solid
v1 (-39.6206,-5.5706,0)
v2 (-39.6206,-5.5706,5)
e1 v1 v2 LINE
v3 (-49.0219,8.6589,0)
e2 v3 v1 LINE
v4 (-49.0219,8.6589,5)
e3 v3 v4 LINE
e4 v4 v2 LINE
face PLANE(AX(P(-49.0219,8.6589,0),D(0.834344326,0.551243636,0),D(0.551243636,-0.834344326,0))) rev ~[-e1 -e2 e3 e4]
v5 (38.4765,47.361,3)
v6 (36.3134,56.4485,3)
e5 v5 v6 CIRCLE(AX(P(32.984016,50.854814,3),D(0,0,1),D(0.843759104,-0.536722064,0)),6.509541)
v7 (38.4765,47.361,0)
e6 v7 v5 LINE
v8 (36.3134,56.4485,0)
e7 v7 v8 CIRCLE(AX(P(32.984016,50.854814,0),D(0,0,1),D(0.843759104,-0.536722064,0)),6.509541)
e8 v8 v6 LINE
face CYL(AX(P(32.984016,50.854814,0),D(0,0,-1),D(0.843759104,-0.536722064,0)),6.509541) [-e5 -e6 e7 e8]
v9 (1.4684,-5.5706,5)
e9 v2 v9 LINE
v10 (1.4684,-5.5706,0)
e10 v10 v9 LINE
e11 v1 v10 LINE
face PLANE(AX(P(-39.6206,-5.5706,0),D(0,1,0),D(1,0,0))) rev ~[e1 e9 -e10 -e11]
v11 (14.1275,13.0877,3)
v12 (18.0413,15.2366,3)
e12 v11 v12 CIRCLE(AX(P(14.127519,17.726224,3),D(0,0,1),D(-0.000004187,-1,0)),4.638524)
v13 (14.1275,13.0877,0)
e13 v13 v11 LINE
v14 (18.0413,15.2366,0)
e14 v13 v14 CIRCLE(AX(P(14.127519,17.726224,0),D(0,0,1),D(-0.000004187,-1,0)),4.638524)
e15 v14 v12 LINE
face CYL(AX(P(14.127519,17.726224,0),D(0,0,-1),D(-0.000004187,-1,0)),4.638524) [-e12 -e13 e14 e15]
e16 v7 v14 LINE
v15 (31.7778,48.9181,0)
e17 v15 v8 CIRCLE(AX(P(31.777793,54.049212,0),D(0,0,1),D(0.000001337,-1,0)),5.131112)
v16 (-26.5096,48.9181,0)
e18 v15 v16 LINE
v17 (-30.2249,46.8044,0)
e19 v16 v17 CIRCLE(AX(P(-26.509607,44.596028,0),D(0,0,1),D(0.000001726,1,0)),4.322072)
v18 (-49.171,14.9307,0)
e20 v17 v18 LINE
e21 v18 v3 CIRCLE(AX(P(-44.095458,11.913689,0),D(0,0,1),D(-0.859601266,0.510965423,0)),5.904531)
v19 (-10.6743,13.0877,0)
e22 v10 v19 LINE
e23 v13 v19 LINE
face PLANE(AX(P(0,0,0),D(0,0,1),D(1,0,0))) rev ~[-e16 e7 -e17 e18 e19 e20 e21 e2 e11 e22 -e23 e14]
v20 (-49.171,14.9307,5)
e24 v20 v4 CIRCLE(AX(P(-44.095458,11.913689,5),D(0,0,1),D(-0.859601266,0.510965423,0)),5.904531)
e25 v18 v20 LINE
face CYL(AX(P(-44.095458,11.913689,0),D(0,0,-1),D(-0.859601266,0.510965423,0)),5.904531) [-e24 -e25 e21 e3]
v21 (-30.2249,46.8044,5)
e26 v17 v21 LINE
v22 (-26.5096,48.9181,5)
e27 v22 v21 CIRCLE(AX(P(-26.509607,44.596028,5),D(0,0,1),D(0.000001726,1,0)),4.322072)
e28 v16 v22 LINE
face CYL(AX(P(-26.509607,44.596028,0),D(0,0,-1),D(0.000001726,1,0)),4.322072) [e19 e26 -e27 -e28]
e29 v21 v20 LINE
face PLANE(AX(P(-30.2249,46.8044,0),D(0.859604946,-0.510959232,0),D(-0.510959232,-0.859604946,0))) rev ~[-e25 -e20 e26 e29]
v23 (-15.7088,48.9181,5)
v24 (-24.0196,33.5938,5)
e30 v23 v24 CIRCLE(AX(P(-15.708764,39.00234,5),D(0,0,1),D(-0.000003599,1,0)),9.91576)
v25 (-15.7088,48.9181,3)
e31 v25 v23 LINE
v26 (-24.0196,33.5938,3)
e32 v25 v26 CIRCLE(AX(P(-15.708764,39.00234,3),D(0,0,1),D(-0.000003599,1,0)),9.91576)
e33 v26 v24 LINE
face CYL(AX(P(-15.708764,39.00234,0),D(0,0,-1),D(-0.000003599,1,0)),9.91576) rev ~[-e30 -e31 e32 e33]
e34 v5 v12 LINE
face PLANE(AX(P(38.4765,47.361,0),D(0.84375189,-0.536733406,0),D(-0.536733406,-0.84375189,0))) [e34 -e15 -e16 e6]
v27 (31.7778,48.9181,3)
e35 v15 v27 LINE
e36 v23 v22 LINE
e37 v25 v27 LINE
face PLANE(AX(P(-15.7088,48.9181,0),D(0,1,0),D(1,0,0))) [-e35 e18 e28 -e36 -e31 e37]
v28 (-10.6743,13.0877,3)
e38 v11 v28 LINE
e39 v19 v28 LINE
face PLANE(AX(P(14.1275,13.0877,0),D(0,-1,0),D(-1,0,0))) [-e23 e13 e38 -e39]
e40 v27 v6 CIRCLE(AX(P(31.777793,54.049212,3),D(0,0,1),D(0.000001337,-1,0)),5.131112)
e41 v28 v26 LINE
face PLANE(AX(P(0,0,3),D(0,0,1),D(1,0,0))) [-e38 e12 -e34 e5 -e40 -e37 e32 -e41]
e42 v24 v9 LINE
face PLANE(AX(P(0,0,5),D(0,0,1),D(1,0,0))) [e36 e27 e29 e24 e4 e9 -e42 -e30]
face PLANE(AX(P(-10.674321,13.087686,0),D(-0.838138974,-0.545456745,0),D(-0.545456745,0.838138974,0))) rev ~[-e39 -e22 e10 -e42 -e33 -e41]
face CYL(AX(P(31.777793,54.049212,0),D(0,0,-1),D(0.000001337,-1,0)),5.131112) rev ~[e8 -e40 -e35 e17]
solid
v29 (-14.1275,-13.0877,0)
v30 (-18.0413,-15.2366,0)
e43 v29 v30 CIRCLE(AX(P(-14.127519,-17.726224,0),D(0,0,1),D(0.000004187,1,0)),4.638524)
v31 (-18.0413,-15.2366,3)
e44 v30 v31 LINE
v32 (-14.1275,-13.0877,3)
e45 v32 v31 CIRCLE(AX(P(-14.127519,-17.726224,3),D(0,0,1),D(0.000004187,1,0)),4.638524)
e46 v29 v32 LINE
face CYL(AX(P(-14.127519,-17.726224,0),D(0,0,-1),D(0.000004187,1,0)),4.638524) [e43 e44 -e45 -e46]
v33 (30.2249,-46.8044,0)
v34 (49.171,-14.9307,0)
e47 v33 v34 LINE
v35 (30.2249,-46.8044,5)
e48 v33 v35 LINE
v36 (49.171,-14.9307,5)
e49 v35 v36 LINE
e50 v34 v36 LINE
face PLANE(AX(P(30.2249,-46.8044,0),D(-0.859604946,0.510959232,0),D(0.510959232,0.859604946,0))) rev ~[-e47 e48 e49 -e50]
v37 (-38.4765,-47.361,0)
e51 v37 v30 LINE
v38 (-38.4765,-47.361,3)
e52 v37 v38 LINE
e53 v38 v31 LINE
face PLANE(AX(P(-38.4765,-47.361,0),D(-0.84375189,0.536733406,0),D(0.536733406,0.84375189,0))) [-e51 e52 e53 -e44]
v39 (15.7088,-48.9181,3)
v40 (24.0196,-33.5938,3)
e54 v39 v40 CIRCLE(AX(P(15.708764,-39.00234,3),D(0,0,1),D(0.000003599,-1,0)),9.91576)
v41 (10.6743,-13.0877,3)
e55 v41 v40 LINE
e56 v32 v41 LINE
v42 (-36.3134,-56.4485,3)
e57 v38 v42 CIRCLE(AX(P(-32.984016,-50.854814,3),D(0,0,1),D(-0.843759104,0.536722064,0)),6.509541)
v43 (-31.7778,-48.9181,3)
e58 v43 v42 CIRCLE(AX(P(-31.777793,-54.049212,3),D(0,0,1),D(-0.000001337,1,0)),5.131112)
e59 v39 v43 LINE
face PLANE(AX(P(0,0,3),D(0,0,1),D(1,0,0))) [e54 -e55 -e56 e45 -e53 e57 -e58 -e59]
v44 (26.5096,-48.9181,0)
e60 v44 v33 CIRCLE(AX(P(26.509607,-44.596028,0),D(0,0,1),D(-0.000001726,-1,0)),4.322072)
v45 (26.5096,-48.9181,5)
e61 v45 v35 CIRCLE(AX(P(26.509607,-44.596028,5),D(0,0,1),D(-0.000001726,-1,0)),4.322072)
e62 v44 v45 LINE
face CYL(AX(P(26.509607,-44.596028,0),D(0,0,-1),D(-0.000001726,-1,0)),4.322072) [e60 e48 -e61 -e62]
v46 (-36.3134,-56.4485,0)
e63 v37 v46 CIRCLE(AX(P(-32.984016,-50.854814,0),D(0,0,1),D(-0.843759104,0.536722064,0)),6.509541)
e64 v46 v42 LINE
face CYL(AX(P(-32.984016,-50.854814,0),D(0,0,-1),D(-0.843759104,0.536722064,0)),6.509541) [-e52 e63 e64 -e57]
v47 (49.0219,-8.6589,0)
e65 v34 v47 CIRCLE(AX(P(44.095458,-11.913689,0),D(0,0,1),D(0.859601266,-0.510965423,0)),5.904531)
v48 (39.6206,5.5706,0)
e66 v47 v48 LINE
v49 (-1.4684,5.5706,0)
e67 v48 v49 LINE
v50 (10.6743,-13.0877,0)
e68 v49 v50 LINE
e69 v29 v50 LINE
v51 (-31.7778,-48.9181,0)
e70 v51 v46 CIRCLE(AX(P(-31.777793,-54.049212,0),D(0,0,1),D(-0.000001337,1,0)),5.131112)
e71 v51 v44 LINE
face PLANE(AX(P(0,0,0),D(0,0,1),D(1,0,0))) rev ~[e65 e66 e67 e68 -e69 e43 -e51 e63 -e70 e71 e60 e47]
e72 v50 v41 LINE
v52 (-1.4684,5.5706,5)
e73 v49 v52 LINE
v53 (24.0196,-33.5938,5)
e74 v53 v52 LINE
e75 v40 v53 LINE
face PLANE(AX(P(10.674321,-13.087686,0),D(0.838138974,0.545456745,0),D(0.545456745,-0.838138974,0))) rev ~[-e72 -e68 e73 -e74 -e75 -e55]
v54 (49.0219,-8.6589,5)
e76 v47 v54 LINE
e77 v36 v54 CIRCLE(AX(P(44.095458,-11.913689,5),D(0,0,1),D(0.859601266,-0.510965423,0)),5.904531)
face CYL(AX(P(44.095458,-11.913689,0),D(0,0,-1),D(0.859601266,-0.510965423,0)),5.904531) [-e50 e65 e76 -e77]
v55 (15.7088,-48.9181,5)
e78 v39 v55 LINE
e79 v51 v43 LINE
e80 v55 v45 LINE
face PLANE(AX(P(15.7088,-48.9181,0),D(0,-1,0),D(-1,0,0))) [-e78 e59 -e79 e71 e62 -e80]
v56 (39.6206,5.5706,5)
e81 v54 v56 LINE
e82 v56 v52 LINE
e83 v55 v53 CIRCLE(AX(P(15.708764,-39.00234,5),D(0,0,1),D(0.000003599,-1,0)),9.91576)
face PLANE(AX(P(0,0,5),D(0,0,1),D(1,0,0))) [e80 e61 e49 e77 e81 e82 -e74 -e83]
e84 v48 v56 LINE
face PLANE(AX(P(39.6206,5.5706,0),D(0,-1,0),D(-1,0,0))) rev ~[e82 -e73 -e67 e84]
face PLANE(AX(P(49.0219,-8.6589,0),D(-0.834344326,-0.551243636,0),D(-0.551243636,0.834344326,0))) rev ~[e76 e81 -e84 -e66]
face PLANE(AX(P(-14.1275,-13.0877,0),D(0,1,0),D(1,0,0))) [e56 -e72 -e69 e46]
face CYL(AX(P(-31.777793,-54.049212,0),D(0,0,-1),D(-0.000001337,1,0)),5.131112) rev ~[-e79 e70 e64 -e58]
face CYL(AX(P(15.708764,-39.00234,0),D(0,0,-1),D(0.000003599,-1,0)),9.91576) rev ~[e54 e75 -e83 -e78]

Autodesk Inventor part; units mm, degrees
ref_plane "YZ Plane" through (0, 0, 0) normal (1, 0, 0) x (0, 1, 0)
ref_plane "XZ Plane" through (0, 0, 0) normal (0, 1, 0) x (-1, 0, 0)
ref_plane "XY Plane" through (0, 0, 0) normal (0, 0, 1) x (1, 0, 0)
sketch "SEGECO_Logo_A" plane through (0, 0, 0) normal (0, 0, 1) x (1, 0, 0)
  line L0 (106.4876, 54.7826) -> (93.1423, 75.2888)
  line L1 (131.2894, 54.7826) -> (106.4876, 54.7826)
  arc A0 (131.2894, 54.7826) -> (135.2032, 56.9315) centre (131.2894, 59.4212) ccw
  line L2 (101.453, 90.6131) -> (148.9397, 90.6131)
  arc A1 (101.453, 90.6131) -> (93.1423, 75.2888) centre (101.453, 80.6974) ccw
  line L3 (155.6383, 89.056) -> (135.2032, 56.9315)
  arc A2 (148.9397, 90.6131) -> (153.4753, 98.1434) centre (148.9397, 95.7441) ccw
  arc A3 (155.6383, 89.056) -> (153.4753, 98.1434) centre (150.146, 92.5498) ccw
  line L4 (91.5373, 98.1434) -> (156.6554, 98.1434) construction
  line L5 (156.6554, 98.1434) -> (156.6554, 54.7826) construction
  line L6 (156.6554, 54.7826) -> (91.5373, 54.7826) construction
  line L7 (91.5373, 54.7826) -> (91.5373, 98.1434) construction
  line L8 (148.9397, 90.6131) -> (148.9397, 98.1434) construction
  dimension "d53" = 9.9157
  dimension "d54" = 5.1311
  dimension "d55" = 6.5095
  dimension "d56" = 4.6386
  dimension "d63" = 1.2062
  dimension "d90" = 123.056
  dimension "d91" = 24.8018
  dimension "d92" = 20.5062
  dimension "d93" = 43.3608
  dimension "d95" = 65.1181
sketch "SEGECO_Logo_B" plane through (0, 0, 0) normal (0, 0, 1) x (1, 0, 0)
  arc A0 (59.5618, 148.275) -> (51.2511, 132.9507) centre (59.5618, 138.3593) ccw
  line L0 (59.5618, 148.275) -> (48.761, 148.275)
  line L1 (45.0457, 146.1613) -> (26.0996, 114.2875)
  line L2 (26.2488, 108.0158) -> (35.65, 93.7862)
  line L3 (35.65, 93.7862) -> (76.7391, 93.7862)
  line L4 (76.7391, 93.7862) -> (51.2511, 132.9507)
  arc A1 (26.0996, 114.2875) -> (26.2488, 108.0158) centre (31.1752, 111.2706) ccw
  line L5 (25.2707, 148.275) -> (76.7391, 148.275) construction
  line L6 (76.7391, 148.275) -> (76.7391, 93.7862) construction
  line L7 (76.7391, 93.7862) -> (25.2707, 93.7862) construction
  line L8 (25.2707, 93.7862) -> (25.2707, 148.275) construction
  arc A2 (48.761, 148.275) -> (45.0457, 146.1613) centre (48.761, 143.9529) ccw
  point P0 (75.2707, 99.3568)
  dimension "d68" = 9.9157
  dimension "d70" = 5.9045
  dimension "d76" = 5.5706
  dimension "d77" = 1.4684
  dimension "d82" = 123.452
  dimension "d83" = 123.056
  dimension "d84" = 14.2295
  dimension "d86" = 54.4888
  dimension "d87" = 51.4684
  dimension "d89" = 23.4904
  dimension "d100" = 4.3221
sketch "Logo_base" plane through (0, 0, 0) normal (0, 0, 1) x (1, 0, 0)
  arc A0 (-15.7088, 48.9181) -> (-24.0196, 33.5938) centre (-15.7088, 39.0024) ccw
  line L0 (-15.7088, 48.9181) -> (-26.5096, 48.9181)
  line L1 (-30.2249, 46.8044) -> (-49.171, 14.9307)
  line L2 (-49.0219, 8.6589) -> (-39.6206, -5.5706)
  line L3 (-39.6206, -5.5706) -> (1.4684, -5.5706)
  line L4 (1.4684, -5.5706) -> (-24.0196, 33.5938)
  arc A1 (-49.171, 14.9307) -> (-49.0219, 8.6589) centre (-44.0955, 11.9137) ccw
  line L5 (-50, 48.9181) -> (1.4684, 48.9181) construction
  line L6 (1.4684, 48.9181) -> (1.4684, -5.5706) construction
  line L7 (1.4684, -5.5706) -> (-50, -5.5706) construction
  line L8 (-50, -5.5706) -> (-50, 48.9181) construction
  arc A2 (-26.5096, 48.9181) -> (-30.2249, 46.8044) centre (-26.5096, 44.596) ccw
  line L9 (-10.6743, 13.0877) -> (-24.0196, 33.5938)
  line L10 (14.1275, 13.0877) -> (-10.6743, 13.0877)
  arc A3 (14.1275, 13.0877) -> (18.0413, 15.2366) centre (14.1275, 17.7263) ccw
  line L11 (-15.7088, 48.9181) -> (31.7778, 48.9181)
  arc A4 (-15.7088, 48.9181) -> (-24.0196, 33.5938) centre (-15.7088, 39.0024) ccw
  line L12 (38.4765, 47.361) -> (18.0413, 15.2366)
  arc A5 (31.7778, 48.9181) -> (36.3134, 56.4485) centre (31.7778, 54.0492) ccw
  arc A6 (38.4765, 47.361) -> (36.3134, 56.4485) centre (32.9841, 50.8548) ccw
  line L13 (-25.6245, 56.4485) -> (39.4935, 56.4485) construction
  line L14 (39.4935, 56.4485) -> (39.4935, 13.0877) construction
  line L15 (39.4935, 13.0877) -> (-25.6245, 13.0877) construction
  line L16 (-25.6245, 13.0877) -> (-25.6245, 56.4485) construction
  line L17 (31.7778, 48.9181) -> (31.7778, 56.4485) construction
  arc A7 (15.7088, -48.9181) -> (24.0196, -33.5938) centre (15.7088, -39.0024) ccw
  line L18 (15.7088, -48.9181) -> (26.5096, -48.9181)
  line L19 (30.2249, -46.8044) -> (49.171, -14.9307)
  line L20 (49.0219, -8.6589) -> (39.6206, 5.5706)
  line L21 (39.6206, 5.5706) -> (-1.4684, 5.5706)
  line L22 (-1.4684, 5.5706) -> (24.0196, -33.5938)
  arc A8 (49.171, -14.9307) -> (49.0219, -8.6589) centre (44.0955, -11.9137) ccw
  line L23 (50, -48.9181) -> (-1.4684, -48.9181) construction
  line L24 (-1.4684, -48.9181) -> (-1.4684, 5.5706) construction
  line L25 (-1.4684, 5.5706) -> (50, 5.5706) construction
  line L26 (50, 5.5706) -> (50, -48.9181) construction
  arc A9 (26.5096, -48.9181) -> (30.2249, -46.8044) centre (26.5096, -44.596) ccw
  line L27 (10.6743, -13.0877) -> (24.0196, -33.5938)
  line L28 (-14.1275, -13.0877) -> (10.6743, -13.0877)
  arc A10 (-14.1275, -13.0877) -> (-18.0413, -15.2366) centre (-14.1275, -17.7263) ccw
  line L29 (15.7088, -48.9181) -> (-31.7778, -48.9181)
  arc A11 (15.7088, -48.9181) -> (24.0196, -33.5938) centre (15.7088, -39.0024) ccw
  line L30 (-38.4765, -47.361) -> (-18.0413, -15.2366)
  arc A12 (-31.7778, -48.9181) -> (-36.3134, -56.4485) centre (-31.7778, -54.0492) ccw
  arc A13 (-38.4765, -47.361) -> (-36.3134, -56.4485) centre (-32.9841, -50.8548) ccw
  line L31 (25.6245, -56.4485) -> (-39.4935, -56.4485) construction
  line L32 (-39.4935, -56.4485) -> (-39.4935, -13.0877) construction
  line L33 (-39.4935, -13.0877) -> (25.6245, -13.0877) construction
  line L34 (25.6245, -13.0877) -> (25.6245, -56.4485) construction
  line L35 (-31.7778, -48.9181) -> (-31.7778, -56.4485) construction
  point P0 (0, 0)
extrude "Logo_A" add sketch "Logo_base" along normal blind 3 contours L11 A5 A6 L12 A3 L10 L4 A0 | L29 A12 A13 L30 A10 L28 L22 A7
extrude "Logo_B" add sketch "Logo_base" along normal blind 5 contours A0 L4 L3 L2 A1 L1 A2 L0 | A7 L22 L21 L20 A8 L19 A9 L18
equation "\"la_wdt_t\" = 65.11809"
equation "\"la_wdt_1\" = 8.20318"
equation "\"la_wdt_2\" = 24.80181"
equation "\"la_hgt_t\" = 43.36081"
equation "\"la_hgt_1\" = 20.50619"
equation "\"la_crv_1\" = 4.6386"
equation "\"la_crv_2\" = 5.13107"
equation "\"la_crv_3\" = 6.50946"
equation "\"la_d_crv_2_3\" = 1.20624"
equation "\"la_lb_crv\" = 9.9157"
equation "\"lb_crv_2\" = 4.32209"
equation "\"lb_hgt_2\" = 31.91169"
equation "\"lb_wdt_1\" = 23.49038"
equation "\"lb_wdt_2\" = 9.00605"
equation "\"lb_wdt_t\" = 51.46841"
equation "\"lb_hgt_t\" = 54.48876"
equation "\"lb_crv_1\" = 5.9045"
equation "\"lb_hgt_1\" = 14.22955"
equation "\"lb_cy\" = 5.57064"
equation "\"lb_cx\" = 1.46841"
equation "\"la_lb_ang_2\" = 56.944183deg"
equation "\"la_lb_ang_1\" = 123.055817deg"
properties part number "Segeco"
